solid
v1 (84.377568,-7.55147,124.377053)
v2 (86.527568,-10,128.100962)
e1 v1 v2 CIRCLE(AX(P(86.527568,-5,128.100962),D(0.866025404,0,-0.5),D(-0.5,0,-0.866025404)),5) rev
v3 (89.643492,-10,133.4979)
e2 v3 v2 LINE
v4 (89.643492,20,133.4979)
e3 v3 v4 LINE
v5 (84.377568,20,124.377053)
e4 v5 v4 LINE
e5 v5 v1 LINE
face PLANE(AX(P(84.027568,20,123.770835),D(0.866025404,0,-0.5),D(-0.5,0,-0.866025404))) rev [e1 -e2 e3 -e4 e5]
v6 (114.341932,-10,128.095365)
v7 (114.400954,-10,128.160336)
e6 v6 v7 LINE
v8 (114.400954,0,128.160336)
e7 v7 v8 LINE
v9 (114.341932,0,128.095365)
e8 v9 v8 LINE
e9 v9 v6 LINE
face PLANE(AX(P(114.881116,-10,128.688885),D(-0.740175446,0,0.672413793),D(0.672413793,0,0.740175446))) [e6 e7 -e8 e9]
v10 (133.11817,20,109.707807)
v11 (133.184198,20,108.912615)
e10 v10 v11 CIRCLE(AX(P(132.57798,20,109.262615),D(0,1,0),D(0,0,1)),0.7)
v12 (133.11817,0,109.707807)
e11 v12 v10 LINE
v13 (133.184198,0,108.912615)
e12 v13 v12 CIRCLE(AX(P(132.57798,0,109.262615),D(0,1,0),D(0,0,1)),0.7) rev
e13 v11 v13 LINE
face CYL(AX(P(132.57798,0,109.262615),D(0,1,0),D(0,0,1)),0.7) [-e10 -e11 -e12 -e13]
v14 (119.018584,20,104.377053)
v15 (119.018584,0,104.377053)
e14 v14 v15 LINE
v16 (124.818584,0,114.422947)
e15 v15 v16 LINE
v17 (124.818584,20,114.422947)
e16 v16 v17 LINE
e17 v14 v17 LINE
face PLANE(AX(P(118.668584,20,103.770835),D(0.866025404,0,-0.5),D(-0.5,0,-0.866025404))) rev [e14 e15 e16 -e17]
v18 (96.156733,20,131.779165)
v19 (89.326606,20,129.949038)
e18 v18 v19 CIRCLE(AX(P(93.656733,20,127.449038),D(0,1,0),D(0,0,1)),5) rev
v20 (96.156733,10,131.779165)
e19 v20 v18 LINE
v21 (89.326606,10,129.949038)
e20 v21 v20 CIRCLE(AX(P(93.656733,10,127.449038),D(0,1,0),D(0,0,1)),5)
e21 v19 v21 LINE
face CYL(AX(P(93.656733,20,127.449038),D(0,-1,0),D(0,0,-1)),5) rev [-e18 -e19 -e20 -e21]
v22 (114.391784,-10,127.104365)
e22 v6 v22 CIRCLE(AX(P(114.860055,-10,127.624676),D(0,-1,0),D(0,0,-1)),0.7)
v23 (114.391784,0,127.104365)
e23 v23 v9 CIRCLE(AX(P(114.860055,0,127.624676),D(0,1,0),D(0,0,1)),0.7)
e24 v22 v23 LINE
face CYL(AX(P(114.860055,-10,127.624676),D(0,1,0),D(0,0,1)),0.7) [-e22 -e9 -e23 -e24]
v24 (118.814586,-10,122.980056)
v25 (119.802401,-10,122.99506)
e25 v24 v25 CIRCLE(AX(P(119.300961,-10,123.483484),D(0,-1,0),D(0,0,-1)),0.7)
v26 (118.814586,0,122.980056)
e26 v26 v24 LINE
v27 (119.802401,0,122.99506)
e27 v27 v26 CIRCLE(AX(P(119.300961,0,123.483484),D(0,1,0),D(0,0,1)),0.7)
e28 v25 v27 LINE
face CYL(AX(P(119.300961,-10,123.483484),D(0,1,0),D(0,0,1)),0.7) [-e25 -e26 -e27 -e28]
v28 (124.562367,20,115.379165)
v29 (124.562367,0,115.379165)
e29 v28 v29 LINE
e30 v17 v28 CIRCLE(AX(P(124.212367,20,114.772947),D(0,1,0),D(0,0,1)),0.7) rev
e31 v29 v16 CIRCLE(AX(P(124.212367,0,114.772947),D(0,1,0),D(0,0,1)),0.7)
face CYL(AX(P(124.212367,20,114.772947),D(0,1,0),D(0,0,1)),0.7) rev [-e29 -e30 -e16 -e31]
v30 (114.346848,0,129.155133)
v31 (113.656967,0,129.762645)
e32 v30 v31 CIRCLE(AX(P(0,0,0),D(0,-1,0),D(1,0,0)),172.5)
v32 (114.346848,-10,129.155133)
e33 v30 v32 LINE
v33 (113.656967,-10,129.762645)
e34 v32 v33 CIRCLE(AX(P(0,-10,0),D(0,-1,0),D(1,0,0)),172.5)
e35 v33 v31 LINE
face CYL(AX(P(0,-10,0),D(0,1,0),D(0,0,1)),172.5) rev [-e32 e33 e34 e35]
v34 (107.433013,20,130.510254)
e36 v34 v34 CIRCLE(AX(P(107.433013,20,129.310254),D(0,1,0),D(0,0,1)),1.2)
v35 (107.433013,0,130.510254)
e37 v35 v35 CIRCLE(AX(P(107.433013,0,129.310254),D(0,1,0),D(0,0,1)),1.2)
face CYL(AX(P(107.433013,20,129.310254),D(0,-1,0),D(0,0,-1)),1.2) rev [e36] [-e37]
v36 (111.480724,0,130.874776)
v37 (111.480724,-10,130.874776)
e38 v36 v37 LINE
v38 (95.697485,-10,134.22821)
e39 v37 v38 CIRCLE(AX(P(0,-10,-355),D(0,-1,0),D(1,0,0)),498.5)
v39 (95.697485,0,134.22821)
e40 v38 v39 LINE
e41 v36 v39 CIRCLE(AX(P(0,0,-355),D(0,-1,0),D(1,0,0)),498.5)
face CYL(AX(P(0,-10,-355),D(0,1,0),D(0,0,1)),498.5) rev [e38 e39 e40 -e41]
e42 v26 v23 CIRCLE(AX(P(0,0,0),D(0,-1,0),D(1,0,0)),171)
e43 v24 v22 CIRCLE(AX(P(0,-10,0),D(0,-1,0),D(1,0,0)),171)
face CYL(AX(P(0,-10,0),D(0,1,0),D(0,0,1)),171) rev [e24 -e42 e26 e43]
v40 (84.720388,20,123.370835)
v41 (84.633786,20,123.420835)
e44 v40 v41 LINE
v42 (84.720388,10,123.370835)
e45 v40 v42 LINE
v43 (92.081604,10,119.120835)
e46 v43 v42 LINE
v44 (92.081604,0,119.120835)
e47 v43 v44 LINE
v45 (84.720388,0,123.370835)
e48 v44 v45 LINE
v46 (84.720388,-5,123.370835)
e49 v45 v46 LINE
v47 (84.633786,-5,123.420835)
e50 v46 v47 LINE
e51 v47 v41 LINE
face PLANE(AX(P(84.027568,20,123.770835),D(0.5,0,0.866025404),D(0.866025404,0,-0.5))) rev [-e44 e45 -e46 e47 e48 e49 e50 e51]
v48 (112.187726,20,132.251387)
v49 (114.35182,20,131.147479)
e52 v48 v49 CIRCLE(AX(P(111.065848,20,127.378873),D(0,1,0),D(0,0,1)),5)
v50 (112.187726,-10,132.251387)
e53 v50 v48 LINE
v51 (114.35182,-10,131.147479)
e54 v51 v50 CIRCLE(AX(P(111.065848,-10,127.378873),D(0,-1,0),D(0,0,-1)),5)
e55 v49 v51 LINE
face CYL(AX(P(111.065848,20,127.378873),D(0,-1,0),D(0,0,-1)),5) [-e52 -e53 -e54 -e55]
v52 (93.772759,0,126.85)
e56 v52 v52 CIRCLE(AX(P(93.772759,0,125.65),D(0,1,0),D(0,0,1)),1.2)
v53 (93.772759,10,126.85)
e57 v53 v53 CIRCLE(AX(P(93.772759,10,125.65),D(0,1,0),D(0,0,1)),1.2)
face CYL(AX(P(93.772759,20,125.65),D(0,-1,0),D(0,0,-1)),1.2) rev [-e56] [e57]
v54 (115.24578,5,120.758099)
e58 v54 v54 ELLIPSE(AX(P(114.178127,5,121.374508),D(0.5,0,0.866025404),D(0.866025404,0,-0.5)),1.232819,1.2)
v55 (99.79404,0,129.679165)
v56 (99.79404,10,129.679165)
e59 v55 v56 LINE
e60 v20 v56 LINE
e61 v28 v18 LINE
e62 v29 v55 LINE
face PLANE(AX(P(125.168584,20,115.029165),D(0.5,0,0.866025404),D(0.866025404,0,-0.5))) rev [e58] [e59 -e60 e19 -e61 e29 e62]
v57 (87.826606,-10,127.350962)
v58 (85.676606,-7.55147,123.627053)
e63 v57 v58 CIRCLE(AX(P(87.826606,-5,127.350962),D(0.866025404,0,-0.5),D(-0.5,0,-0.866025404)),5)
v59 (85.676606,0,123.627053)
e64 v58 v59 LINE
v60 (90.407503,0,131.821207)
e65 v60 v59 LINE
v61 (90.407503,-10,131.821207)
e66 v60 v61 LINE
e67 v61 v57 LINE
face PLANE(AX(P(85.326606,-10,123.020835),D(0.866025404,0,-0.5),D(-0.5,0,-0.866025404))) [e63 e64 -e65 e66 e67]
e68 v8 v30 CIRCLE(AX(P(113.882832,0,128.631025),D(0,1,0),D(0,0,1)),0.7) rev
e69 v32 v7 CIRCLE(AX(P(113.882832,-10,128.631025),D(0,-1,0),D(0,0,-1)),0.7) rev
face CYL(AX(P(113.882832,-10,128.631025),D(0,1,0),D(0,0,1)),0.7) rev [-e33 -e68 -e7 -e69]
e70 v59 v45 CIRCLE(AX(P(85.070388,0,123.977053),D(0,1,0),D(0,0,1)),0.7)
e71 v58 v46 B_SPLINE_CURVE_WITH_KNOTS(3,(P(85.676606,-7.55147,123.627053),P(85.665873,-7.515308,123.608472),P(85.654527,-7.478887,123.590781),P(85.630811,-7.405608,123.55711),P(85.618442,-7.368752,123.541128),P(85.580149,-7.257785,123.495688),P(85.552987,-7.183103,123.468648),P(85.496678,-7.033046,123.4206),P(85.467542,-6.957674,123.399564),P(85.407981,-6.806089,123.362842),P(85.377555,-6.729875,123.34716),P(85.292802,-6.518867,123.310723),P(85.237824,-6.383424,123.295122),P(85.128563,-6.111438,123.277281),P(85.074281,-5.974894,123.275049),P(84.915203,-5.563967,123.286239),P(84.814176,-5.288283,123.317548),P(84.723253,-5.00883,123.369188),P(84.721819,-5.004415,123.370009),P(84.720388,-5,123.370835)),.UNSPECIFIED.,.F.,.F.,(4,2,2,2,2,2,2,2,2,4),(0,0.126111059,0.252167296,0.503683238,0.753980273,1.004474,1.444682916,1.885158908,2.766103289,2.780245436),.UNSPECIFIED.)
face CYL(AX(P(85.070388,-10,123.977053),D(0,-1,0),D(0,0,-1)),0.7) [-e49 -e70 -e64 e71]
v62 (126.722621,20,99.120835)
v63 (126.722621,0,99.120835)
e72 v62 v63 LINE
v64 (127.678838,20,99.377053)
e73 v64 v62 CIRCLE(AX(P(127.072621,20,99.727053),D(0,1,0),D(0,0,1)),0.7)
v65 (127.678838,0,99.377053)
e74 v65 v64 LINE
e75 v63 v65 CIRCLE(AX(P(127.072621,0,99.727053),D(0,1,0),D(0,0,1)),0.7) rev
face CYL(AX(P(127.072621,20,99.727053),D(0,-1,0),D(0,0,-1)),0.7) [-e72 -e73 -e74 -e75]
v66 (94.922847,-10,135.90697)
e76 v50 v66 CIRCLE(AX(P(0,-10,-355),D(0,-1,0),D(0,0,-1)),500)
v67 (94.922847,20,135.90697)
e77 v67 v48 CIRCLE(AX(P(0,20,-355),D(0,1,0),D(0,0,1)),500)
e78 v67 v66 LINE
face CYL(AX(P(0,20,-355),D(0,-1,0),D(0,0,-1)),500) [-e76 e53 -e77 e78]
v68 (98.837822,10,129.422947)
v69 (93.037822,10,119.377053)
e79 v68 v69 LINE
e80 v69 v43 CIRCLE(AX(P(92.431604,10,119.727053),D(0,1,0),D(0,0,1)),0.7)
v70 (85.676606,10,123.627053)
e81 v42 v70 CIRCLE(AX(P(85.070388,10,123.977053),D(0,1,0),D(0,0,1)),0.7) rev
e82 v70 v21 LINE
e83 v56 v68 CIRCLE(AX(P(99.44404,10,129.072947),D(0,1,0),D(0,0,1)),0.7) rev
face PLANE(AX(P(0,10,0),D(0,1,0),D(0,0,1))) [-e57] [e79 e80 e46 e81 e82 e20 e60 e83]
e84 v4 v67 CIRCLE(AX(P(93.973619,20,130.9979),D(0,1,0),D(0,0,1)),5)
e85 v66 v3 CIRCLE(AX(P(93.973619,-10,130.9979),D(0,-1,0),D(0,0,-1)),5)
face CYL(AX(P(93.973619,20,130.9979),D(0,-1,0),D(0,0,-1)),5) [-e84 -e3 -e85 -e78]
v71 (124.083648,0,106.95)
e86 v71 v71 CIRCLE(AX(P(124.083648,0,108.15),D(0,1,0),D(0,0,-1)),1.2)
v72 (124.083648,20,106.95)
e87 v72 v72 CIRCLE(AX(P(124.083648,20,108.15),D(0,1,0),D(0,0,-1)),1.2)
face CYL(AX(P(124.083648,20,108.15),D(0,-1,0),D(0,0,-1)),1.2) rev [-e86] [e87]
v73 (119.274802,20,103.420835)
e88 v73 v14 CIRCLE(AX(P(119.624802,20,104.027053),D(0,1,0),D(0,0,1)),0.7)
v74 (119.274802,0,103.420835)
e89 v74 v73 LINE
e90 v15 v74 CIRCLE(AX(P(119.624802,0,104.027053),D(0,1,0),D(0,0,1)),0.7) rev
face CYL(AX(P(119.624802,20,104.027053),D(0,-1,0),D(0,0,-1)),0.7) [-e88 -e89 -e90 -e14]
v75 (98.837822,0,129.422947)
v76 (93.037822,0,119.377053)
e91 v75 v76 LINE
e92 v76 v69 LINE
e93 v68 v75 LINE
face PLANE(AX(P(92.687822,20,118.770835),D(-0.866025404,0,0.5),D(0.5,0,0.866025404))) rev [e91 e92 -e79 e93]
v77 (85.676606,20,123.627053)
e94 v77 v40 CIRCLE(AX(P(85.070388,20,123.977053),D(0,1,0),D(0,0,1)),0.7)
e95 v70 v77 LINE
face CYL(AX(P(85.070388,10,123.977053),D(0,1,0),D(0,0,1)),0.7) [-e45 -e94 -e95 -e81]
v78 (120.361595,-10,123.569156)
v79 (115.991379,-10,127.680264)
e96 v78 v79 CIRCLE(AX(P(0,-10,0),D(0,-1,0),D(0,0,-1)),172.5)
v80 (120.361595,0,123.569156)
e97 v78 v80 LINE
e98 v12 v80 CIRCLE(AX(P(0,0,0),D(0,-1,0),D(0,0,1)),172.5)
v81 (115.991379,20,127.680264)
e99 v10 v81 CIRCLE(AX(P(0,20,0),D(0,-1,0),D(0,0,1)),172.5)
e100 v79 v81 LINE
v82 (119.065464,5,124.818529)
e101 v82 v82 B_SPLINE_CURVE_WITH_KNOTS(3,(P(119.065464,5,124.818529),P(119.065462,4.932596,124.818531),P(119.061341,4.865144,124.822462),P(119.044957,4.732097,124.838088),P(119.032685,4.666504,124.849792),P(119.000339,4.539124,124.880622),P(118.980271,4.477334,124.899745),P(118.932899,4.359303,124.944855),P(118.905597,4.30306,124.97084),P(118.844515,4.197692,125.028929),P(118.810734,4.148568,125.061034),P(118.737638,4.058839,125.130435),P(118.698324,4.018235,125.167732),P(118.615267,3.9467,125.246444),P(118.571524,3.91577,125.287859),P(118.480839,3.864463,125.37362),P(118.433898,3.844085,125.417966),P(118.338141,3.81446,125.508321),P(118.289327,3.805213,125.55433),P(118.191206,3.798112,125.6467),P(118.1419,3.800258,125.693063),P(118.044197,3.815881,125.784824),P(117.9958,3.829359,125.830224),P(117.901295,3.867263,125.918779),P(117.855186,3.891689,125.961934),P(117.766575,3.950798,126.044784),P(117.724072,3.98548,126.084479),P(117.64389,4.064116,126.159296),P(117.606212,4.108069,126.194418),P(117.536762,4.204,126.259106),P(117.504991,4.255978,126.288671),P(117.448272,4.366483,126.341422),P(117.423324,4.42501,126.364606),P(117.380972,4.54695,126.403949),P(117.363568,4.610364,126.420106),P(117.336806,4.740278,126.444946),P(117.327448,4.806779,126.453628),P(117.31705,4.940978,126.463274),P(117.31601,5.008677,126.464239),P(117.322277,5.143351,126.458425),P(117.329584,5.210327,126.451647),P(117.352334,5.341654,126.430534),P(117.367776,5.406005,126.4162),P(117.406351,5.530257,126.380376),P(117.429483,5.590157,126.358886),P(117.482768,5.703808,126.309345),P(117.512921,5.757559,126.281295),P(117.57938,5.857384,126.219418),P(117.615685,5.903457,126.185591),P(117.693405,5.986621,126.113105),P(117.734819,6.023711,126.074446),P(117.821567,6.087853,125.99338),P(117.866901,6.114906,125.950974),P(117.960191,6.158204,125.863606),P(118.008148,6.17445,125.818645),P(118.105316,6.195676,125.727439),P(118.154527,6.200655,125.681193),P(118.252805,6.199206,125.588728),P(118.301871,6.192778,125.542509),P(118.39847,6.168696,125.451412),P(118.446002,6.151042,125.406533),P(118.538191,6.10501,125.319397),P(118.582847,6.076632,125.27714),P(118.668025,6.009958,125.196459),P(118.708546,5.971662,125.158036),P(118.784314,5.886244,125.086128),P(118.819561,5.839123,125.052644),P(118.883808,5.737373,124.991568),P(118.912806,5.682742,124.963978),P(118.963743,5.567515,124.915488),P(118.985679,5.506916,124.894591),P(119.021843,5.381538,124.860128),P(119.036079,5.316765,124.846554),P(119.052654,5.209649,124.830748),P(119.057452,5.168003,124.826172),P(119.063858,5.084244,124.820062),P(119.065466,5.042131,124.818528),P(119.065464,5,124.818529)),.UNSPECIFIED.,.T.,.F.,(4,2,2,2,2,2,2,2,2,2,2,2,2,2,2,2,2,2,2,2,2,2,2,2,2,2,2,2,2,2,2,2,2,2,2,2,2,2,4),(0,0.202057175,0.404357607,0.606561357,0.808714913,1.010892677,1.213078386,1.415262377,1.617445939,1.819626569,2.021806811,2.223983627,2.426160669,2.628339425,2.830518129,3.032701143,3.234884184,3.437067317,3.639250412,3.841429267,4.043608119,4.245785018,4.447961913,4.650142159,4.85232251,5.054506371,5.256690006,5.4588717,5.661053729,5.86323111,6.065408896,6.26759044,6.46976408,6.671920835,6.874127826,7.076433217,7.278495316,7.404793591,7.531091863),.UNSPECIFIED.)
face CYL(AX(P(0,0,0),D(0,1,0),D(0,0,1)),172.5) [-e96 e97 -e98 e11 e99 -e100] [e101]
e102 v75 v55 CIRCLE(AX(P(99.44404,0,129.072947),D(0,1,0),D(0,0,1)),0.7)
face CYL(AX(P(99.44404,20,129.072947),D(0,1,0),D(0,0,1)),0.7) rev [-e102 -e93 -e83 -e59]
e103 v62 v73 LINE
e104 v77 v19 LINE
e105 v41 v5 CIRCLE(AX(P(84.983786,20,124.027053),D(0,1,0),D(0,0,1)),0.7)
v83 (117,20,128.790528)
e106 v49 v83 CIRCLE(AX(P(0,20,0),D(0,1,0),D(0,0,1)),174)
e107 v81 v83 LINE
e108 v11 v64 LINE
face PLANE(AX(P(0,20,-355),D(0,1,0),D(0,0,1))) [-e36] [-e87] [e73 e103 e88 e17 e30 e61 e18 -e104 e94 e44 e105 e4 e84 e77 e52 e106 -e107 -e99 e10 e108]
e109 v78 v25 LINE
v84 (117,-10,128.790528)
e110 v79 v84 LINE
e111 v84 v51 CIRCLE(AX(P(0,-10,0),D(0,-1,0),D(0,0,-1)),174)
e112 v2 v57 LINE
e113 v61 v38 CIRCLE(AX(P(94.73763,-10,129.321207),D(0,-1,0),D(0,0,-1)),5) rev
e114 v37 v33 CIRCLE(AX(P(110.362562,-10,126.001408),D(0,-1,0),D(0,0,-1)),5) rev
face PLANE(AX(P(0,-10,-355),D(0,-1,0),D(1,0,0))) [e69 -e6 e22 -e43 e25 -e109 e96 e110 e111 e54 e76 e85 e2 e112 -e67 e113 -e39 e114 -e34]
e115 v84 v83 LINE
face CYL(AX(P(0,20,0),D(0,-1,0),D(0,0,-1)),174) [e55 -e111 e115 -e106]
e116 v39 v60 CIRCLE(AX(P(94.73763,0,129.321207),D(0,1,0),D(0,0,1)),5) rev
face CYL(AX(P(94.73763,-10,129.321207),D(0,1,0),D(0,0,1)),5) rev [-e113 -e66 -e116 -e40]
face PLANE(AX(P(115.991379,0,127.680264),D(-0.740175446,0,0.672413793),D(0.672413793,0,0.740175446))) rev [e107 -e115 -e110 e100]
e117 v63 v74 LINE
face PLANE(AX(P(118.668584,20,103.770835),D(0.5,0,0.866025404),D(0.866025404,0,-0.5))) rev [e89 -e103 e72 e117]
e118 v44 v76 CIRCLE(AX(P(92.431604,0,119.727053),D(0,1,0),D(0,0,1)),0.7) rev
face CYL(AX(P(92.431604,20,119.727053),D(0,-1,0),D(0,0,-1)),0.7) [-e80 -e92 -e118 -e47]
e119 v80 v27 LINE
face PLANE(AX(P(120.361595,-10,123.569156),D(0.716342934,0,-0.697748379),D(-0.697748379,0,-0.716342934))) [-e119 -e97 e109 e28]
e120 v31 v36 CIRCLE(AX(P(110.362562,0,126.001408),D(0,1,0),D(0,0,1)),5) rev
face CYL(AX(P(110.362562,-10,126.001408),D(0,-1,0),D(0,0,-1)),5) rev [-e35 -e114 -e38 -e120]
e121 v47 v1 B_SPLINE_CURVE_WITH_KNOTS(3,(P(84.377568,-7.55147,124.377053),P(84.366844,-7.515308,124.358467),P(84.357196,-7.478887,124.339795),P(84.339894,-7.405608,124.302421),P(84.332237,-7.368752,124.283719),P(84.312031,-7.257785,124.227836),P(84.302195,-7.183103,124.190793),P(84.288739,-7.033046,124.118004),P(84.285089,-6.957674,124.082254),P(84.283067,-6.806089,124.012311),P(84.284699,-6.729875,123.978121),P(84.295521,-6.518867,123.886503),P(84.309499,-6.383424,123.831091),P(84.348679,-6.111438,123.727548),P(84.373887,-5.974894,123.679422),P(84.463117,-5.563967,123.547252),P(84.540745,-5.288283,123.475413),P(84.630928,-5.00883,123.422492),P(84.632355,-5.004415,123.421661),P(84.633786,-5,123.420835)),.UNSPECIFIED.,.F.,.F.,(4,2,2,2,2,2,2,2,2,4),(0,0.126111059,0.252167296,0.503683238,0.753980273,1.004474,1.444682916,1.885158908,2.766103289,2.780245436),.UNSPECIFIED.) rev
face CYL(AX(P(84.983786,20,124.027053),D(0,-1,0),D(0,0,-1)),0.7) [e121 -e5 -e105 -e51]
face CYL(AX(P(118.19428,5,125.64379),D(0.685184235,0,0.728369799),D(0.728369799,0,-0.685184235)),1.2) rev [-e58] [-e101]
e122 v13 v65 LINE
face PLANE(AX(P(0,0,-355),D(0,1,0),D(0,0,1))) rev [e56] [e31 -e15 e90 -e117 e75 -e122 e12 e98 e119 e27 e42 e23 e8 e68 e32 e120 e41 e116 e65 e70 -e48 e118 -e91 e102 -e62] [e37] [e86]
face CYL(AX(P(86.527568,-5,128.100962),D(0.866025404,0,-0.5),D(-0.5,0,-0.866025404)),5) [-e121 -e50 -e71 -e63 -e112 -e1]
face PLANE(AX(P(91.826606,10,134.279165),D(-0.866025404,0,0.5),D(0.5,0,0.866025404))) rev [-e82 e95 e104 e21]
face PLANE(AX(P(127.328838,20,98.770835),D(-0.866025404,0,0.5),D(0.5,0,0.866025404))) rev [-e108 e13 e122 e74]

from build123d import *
from build123d.topology import SkipClean

# Parameters (mm, degrees)
ESQUISSE1_R                     = 1.2
BOSS_EXTRU_1_DEPTH              = 20
ENL_V_MAT_EXTRU_1_DEPTH         = 193.532860321
DIAM_TRE_DU_PER_AGE_2_4_2_4_1_D = 2.4
EXTRU_MINCE1_DEPTH              = 10
ENL_V_MAT_EXTRU_2_DEPTH         = 10
CONG_1_R                        = 0.7
CONG_2_R                        = 5


with BuildPart() as part:
    # Esquisse1 → Boss.-Extru.1 (new body)
    with BuildSketch(Plane(origin=(0, 0, 0), x_dir=(1, 0, 0), z_dir=(0, 1, 0))):
        with BuildLine():
            Line((84.027568136, -123.770834875), (92.687822174, -118.770834875))
            Line((92.687822174, -118.770834875), (99.187822174, -130.029165125))
            Line((99.187822174, -130.029165125), (125.168584287, -115.029165125))
            Line((125.168584287, -115.029165125), (118.668584287, -103.770834875))
            Line((118.668584287, -103.770834875), (127.328838325, -98.770834875))
            Line((127.328838325, -98.770834875), (134.227704746, -110.720022031))
            ThreePointArc((134.227704746, -110.720022031), (124.269465579, -121.791214481), (113.401091599, -131.970422535))
            ThreePointArc((113.401091599, -131.970422535), (102.435456053, -134.394500729), (91.418143327, -136.571686604))
            Line((91.418143327, -136.571686604), (84.027568136, -123.770834875))
        make_face()
        with Locations(Location((93.772758664, -125.65, 0), (0, 0, 270))):
            Circle(ESQUISSE1_R, mode=Mode.SUBTRACT)
        with Locations(Location((124.083647797, -108.15, 0), (0, 0, 90))):
            Circle(ESQUISSE1_R, mode=Mode.SUBTRACT)
        with Locations(Location((107.433012702, -129.310254038, 0), (0, 0, 270))):
            Circle(ESQUISSE1_R, mode=Mode.SUBTRACT)
    extrude(amount=BOSS_EXTRU_1_DEPTH)

    # Esquisse2 → Enlèv. mat.-Extru.1 (cut, through all)
    with BuildSketch(Plane(origin=(0, 20, 0), x_dir=(1, 0, 0), z_dir=(0, 1, 0))):
        with BuildLine():
            Line((115.99137931, -127.680264433), (117, -128.790527602))
            ThreePointArc((117, -128.790527602), (125.938380571, -120.064667155), (134.227704746, -110.720022031))
            Line((134.227704746, -110.720022031), (133.426606, -109.332478301))
            ThreePointArc((133.426606, -109.332478301), (125.045964201, -118.82658304), (115.99137931, -127.680264433))
        make_face()
    extrude(amount=-ENL_V_MAT_EXTRU_1_DEPTH, mode=Mode.SUBTRACT)

    # Diamètre du perçage Ø2.4 (2.4)1 (through all)
    with Locations(Plane(origin=(118.194280465, 5, 125.643790397), x_dir=(0.728369799401, 0, -0.685184234583), z_dir=(0.685184234583, 0, 0.728369799401))):
        with Locations((1e-09, 0)):
            Hole(DIAM_TRE_DU_PER_AGE_2_4_2_4_1_D / 2)

    # Esquisse4 → Extru.-Mince1 (add)
    with SkipClean():  # the faces are left unmerged after this step: merging them gives an invalid solid
        with BuildSketch(Plane.XZ):
            with BuildLine():
                Line((84.027568136, 123.770834875), (91.418143327, 136.571686604))
                ThreePointArc((91.418143327, 136.571686604), (102.435456053, 134.394500729), (113.401091599, 131.970422535))
                ThreePointArc((113.401091599, 131.970422535), (115.211517156, 130.392892117), (117, 128.790527602))
                Line((117, 128.790527602), (115.99137931, 127.680264433))
                ThreePointArc((115.99137931, 127.680264433), (118.194363092, 125.643712669), (120.361595403, 123.569156152))
                Line((120.361595403, 123.569156152), (119.314972834, 122.49464175))
                ThreePointArc((119.314972834, 122.49464175), (116.61917678, 125.063854119), (113.868071592, 127.573752285))
                Line((113.868071592, 127.573752285), (114.876730751, 128.6840578))
                ThreePointArc((114.876730751, 128.6840578), (113.79334288, 129.643068138), (112.701949349, 130.592957746))
                ThreePointArc((112.701949349, 130.592957746), (102.466724149, 132.855327369), (92.1861921, 134.901986101))
                Line((92.1861921, 134.901986101), (85.326606241, 123.020834875))
                Line((85.326606241, 123.020834875), (84.027568136, 123.770834875))
            make_face()
        extrude(amount=EXTRU_MINCE1_DEPTH)

    # Esquisse5 → Enlèv. mat.-Extru.2 (cut)
    with SkipClean():  # the faces are left unmerged after this step: merging them gives an invalid solid
        with BuildSketch(Plane(origin=(0, 20, 0), x_dir=(1, 0, 0), z_dir=(0, 1, 0))):
            Polygon((112.17820323, -122.529165125), (91.826606241, -134.279165125), (85.326606241, -123.020834875), (105.67820323, -111.270834875), align=None)
        extrude(amount=-ENL_V_MAT_EXTRU_2_DEPTH, mode=Mode.SUBTRACT)

    # Congé1
    # the kernel refuses this fillet: 0.7 mm, written as the material it adds along each edge
    with BuildSketch(Plane(origin=(125.168584287, 0, 115.029165125), x_dir=(-0.5000000000000003, 0, -0.8660254037844384), z_dir=(0, 1, 0))) as cong_1_piece_1:
        with BuildLine():
            CenterArc((CONG_1_R, CONG_1_R), CONG_1_R, 180, 90)
            Line((0, CONG_1_R), (0, 0))
            Line((0, 0), (CONG_1_R, 0))
        make_face()
    extrude(amount=20)
    with BuildSketch(Plane(origin=(99.187822174, 0, 130.029165125), x_dir=(-0.5000000000000068, 0, -0.8660254037844347), z_dir=(0, 1, 0))) as cong_1_piece_2:
        with BuildLine():
            CenterArc((CONG_1_R, -CONG_1_R), CONG_1_R, 90, 90)
            Line((0, -CONG_1_R), (0, 0))
            Line((0, 0), (CONG_1_R, 0))
        make_face()
    extrude(amount=10)
    with BuildSketch(Plane(origin=(114.876730751, 1.772512212, 128.6840578), x_dir=(-0.7473615518357495, 0, 0.6644175726436354), z_dir=(0, -1, 0))) as cong_1_piece_3:
        with BuildLine():
            CenterArc((0.707566324, 0.699998522), CONG_1_R, 179.384021678, 90.733726194)
            Line((0.007606777, 0.707523972), (0, 0))
            ThreePointArc((0, 0), (0.354502442, -0.000364267), (0.709004885, 0))
        make_face()
    extrude(amount=11.772512212)
    # the kernel refuses this fillet: 0.7 mm, written as the material it takes off along each edge
    with BuildSketch(Plane(origin=(85.326606241, 0, 123.020834875), x_dir=(-0.8660254037844296, 0, 0.5000000000000155), z_dir=(0, -1, 0)), Plane(origin=(85.326606241, 21.75, 123.020834875), x_dir=(-0.8660254037844347, 0, 0.5000000000000068), z_dir=(0, -1, 0)), Plane(origin=(84.027568136, 0, 123.770834875), x_dir=(0.5000000000000003, 0, 0.8660254037844384), z_dir=(0, -1, 0))) as cong_1_2_piece_1:
        with BuildLine():
            CenterArc((CONG_1_R, -CONG_1_R), CONG_1_R, 90, 90)
            Line((0, -CONG_1_R), (0, 0))
            Line((0, 0), (CONG_1_R, 0))
        make_face()
    extrude(amount=11.75, mode=Mode.SUBTRACT)
    with BuildSketch(Plane(origin=(84.027568136, 0, 123.770834875), x_dir=(0.5000000000000003, 0, 0.8660254037844384), z_dir=(0, 1, 0))) as cong_1_2_piece_2:
        with BuildLine():
            CenterArc((CONG_1_R, CONG_1_R), CONG_1_R, 180, 90)
            Line((0, CONG_1_R), (0, 0))
            Line((0, 0), (CONG_1_R, 0))
        make_face()
    extrude(amount=21.75, mode=Mode.SUBTRACT)
    with BuildSketch(Plane(origin=(127.328838325, -1.75, 98.770834875), x_dir=(0.499999999999998, 0, 0.8660254037844398), z_dir=(0, 1, 0)), Plane(origin=(118.668584287, -1.75, 103.770834875), x_dir=(0.8660254037844384, 0, -0.5000000000000003), z_dir=(0, 1, 0))) as cong_1_2_piece_3:
        with BuildLine():
            CenterArc((CONG_1_R, -CONG_1_R), CONG_1_R, 90, 90)
            Line((0, -CONG_1_R), (0, 0))
            Line((0, 0), (CONG_1_R, 0))
        make_face()
    extrude(amount=23.5, mode=Mode.SUBTRACT)
    with BuildSketch(Plane(origin=(133.426606, 21.214506308, 109.332478301), x_dir=(-0.6349000058831564, 0, 0.7725943195038182), z_dir=(0, -1, 0))) as cong_1_2_piece_4:
        with BuildLine():
            CenterArc((0.484816837, 0.699999306), CONG_1_R, 200.587431515, 69.493248031)
            Line((-0.170478849, 0.453853893), (0, 0))
            ThreePointArc((0, 0), (0.242901262, -0.000171018), (0.485802523, 0))
        make_face()
    extrude(amount=22.429012616, mode=Mode.SUBTRACT)
    with BuildSketch(Plane(origin=(92.687822174, -1.75, 118.770834875), x_dir=(-0.8660254037844347, 0, 0.5000000000000068), z_dir=(0, 1, 0))) as cong_1_2_piece_5:
        with BuildLine():
            CenterArc((CONG_1_R, CONG_1_R), CONG_1_R, 180, 90)
            Line((0, CONG_1_R), (0, 0))
            Line((0, 0), (CONG_1_R, 0))
        make_face()
    extrude(amount=13.5, mode=Mode.SUBTRACT)
    with BuildSketch(Plane(origin=(119.314972834, 0, 122.49464175), x_dir=(-0.7177637664774796, 0, 0.6962867049801125), z_dir=(0, -1, 0))) as cong_1_2_piece_6:
        with BuildLine():
            CenterArc((0.698574544, -0.699998546), CONG_1_R, 90.116794283, 89.766411434)
            Line((-0.001424002, -0.698571635), (0, 0))
            ThreePointArc((0, 0), (0.348573817, -0.000355274), (0.697147634, 0))
        make_face()
    extrude(amount=11.746432717, mode=Mode.SUBTRACT)
    with BuildSketch(Plane(origin=(113.868071592, 0, 127.573752285), x_dir=(0.6724137931033691, 0, 0.7401754459885436), z_dir=(0, -1, 0))) as cong_1_2_piece_7:
        with BuildLine():
            CenterArc((0.704715348, -0.7), CONG_1_R, 90, 90.266958587)
            ThreePointArc((0.004722946, -0.703261503), (0.002723014, -0.351628323), (0, 0))
            Line((0, 0), (0.704715348, 0))
        make_face()
    extrude(amount=11.76178837, mode=Mode.SUBTRACT)

    # Congé2
    # the kernel refuses this fillet: 5 mm, written as the material it adds along each edge
    with BuildSketch(Plane(origin=(92.1861921, 8.938383059, 134.901986101), x_dir=(0.9820827402296215, 0, -0.18845023572040911), z_dir=(0, -1, 0))) as cong_2_piece_1:
        with BuildLine():
            CenterArc((3.557422666, -4.999967849), CONG_2_R, 89.794530502, 71.067825025)
            Line((-1.166245932, -3.360774456), (0, 0))
            ThreePointArc((0, 0), (1.787676612, 0.003205414), (3.575353224, 0))
        make_face()
    extrude(amount=18.938383059)
    with BuildSketch(Plane(origin=(112.701949349, 3.163738142, 130.592957746), x_dir=(0.7546589965998223, 0, -0.6561172142620169), z_dir=(0, -1, 0))) as cong_2_piece_2:
        with BuildLine():
            CenterArc((1.247154746, -4.999966362), CONG_2_R, 89.789832754, 28.292116565)
            ThreePointArc((-1.106515, -0.588590304), (-0.553442478, -0.293947404), (0, 0))
            ThreePointArc((0, 0), (0.632747628, 0.001160495), (1.265495257, 0))
        make_face()
    extrude(amount=13.163738142)
    with BuildSketch(Plane(origin=(91.826606241, 20, 134.279165125), x_dir=(0.866025403784453, 0, -0.49999999999997513), z_dir=(0, -1, 0))) as cong_2_piece_3:
        with BuildLine():
            CenterArc((CONG_2_R, -CONG_2_R), CONG_2_R, 90, 90)
            Line((0, -CONG_2_R), (0, 0))
            Line((0, 0), (CONG_2_R, 0))
        make_face()
    extrude(amount=10)
    # the kernel refuses this fillet: 5 mm, written as the material it takes off along each edge
    with BuildSketch(Plane(origin=(113.401091599, -13.143565693, 131.970422535), x_dir=(0.7560908595637044, 1.2400707538838124e-15, -0.6544666623168968), z_dir=(0, 1, 0))) as cong_2_2_piece_1:
        with BuildLine():
            CenterArc((1.239359808, 4.99996736), CONG_2_R, 242.086933336, 28.120093605)
            ThreePointArc((-1.101296945, 0.581672896), (-0.550829587, 0.29049354), (0, 0))
            ThreePointArc((0, 0), (0.628713139, -0.001135866), (1.257426277, 0))
        make_face()
    extrude(amount=36.287131385, mode=Mode.SUBTRACT)
    with BuildSketch(Plane(origin=(91.418143327, -18.917959017, 136.571686604), x_dir=(0.9824849074326925, 0, -0.18634217629665503), z_dir=(0, 1, 0))) as cong_2_2_piece_2:
        with BuildLine():
            CenterArc((3.549347689, 4.999968188), CONG_2_R, 199.260605737, 70.943779261)
            Line((-1.170792196, 3.350641212), (0, 0))
            ThreePointArc((0, 0), (1.783591803, -0.00318121), (3.567183607, 0))
        make_face()
    extrude(amount=47.835918033, mode=Mode.SUBTRACT)
    with BuildSketch(Plane(origin=(95.545706006, -10, 117.120834875), x_dir=(0.5000000000000072, 0, 0.8660254037844346), z_dir=(-0.8660254037844346, 0, 0.5000000000000071))) as cong_2_2_piece_3:
        with BuildLine():
            CenterArc((CONG_2_R, CONG_2_R), CONG_2_R, 180, 90)
            Line((0, CONG_2_R), (0, 0))
            Line((0, 0), (CONG_2_R, 0))
        make_face()
    extrude(amount=25.1, mode=Mode.SUBTRACT)


solid = part.part
